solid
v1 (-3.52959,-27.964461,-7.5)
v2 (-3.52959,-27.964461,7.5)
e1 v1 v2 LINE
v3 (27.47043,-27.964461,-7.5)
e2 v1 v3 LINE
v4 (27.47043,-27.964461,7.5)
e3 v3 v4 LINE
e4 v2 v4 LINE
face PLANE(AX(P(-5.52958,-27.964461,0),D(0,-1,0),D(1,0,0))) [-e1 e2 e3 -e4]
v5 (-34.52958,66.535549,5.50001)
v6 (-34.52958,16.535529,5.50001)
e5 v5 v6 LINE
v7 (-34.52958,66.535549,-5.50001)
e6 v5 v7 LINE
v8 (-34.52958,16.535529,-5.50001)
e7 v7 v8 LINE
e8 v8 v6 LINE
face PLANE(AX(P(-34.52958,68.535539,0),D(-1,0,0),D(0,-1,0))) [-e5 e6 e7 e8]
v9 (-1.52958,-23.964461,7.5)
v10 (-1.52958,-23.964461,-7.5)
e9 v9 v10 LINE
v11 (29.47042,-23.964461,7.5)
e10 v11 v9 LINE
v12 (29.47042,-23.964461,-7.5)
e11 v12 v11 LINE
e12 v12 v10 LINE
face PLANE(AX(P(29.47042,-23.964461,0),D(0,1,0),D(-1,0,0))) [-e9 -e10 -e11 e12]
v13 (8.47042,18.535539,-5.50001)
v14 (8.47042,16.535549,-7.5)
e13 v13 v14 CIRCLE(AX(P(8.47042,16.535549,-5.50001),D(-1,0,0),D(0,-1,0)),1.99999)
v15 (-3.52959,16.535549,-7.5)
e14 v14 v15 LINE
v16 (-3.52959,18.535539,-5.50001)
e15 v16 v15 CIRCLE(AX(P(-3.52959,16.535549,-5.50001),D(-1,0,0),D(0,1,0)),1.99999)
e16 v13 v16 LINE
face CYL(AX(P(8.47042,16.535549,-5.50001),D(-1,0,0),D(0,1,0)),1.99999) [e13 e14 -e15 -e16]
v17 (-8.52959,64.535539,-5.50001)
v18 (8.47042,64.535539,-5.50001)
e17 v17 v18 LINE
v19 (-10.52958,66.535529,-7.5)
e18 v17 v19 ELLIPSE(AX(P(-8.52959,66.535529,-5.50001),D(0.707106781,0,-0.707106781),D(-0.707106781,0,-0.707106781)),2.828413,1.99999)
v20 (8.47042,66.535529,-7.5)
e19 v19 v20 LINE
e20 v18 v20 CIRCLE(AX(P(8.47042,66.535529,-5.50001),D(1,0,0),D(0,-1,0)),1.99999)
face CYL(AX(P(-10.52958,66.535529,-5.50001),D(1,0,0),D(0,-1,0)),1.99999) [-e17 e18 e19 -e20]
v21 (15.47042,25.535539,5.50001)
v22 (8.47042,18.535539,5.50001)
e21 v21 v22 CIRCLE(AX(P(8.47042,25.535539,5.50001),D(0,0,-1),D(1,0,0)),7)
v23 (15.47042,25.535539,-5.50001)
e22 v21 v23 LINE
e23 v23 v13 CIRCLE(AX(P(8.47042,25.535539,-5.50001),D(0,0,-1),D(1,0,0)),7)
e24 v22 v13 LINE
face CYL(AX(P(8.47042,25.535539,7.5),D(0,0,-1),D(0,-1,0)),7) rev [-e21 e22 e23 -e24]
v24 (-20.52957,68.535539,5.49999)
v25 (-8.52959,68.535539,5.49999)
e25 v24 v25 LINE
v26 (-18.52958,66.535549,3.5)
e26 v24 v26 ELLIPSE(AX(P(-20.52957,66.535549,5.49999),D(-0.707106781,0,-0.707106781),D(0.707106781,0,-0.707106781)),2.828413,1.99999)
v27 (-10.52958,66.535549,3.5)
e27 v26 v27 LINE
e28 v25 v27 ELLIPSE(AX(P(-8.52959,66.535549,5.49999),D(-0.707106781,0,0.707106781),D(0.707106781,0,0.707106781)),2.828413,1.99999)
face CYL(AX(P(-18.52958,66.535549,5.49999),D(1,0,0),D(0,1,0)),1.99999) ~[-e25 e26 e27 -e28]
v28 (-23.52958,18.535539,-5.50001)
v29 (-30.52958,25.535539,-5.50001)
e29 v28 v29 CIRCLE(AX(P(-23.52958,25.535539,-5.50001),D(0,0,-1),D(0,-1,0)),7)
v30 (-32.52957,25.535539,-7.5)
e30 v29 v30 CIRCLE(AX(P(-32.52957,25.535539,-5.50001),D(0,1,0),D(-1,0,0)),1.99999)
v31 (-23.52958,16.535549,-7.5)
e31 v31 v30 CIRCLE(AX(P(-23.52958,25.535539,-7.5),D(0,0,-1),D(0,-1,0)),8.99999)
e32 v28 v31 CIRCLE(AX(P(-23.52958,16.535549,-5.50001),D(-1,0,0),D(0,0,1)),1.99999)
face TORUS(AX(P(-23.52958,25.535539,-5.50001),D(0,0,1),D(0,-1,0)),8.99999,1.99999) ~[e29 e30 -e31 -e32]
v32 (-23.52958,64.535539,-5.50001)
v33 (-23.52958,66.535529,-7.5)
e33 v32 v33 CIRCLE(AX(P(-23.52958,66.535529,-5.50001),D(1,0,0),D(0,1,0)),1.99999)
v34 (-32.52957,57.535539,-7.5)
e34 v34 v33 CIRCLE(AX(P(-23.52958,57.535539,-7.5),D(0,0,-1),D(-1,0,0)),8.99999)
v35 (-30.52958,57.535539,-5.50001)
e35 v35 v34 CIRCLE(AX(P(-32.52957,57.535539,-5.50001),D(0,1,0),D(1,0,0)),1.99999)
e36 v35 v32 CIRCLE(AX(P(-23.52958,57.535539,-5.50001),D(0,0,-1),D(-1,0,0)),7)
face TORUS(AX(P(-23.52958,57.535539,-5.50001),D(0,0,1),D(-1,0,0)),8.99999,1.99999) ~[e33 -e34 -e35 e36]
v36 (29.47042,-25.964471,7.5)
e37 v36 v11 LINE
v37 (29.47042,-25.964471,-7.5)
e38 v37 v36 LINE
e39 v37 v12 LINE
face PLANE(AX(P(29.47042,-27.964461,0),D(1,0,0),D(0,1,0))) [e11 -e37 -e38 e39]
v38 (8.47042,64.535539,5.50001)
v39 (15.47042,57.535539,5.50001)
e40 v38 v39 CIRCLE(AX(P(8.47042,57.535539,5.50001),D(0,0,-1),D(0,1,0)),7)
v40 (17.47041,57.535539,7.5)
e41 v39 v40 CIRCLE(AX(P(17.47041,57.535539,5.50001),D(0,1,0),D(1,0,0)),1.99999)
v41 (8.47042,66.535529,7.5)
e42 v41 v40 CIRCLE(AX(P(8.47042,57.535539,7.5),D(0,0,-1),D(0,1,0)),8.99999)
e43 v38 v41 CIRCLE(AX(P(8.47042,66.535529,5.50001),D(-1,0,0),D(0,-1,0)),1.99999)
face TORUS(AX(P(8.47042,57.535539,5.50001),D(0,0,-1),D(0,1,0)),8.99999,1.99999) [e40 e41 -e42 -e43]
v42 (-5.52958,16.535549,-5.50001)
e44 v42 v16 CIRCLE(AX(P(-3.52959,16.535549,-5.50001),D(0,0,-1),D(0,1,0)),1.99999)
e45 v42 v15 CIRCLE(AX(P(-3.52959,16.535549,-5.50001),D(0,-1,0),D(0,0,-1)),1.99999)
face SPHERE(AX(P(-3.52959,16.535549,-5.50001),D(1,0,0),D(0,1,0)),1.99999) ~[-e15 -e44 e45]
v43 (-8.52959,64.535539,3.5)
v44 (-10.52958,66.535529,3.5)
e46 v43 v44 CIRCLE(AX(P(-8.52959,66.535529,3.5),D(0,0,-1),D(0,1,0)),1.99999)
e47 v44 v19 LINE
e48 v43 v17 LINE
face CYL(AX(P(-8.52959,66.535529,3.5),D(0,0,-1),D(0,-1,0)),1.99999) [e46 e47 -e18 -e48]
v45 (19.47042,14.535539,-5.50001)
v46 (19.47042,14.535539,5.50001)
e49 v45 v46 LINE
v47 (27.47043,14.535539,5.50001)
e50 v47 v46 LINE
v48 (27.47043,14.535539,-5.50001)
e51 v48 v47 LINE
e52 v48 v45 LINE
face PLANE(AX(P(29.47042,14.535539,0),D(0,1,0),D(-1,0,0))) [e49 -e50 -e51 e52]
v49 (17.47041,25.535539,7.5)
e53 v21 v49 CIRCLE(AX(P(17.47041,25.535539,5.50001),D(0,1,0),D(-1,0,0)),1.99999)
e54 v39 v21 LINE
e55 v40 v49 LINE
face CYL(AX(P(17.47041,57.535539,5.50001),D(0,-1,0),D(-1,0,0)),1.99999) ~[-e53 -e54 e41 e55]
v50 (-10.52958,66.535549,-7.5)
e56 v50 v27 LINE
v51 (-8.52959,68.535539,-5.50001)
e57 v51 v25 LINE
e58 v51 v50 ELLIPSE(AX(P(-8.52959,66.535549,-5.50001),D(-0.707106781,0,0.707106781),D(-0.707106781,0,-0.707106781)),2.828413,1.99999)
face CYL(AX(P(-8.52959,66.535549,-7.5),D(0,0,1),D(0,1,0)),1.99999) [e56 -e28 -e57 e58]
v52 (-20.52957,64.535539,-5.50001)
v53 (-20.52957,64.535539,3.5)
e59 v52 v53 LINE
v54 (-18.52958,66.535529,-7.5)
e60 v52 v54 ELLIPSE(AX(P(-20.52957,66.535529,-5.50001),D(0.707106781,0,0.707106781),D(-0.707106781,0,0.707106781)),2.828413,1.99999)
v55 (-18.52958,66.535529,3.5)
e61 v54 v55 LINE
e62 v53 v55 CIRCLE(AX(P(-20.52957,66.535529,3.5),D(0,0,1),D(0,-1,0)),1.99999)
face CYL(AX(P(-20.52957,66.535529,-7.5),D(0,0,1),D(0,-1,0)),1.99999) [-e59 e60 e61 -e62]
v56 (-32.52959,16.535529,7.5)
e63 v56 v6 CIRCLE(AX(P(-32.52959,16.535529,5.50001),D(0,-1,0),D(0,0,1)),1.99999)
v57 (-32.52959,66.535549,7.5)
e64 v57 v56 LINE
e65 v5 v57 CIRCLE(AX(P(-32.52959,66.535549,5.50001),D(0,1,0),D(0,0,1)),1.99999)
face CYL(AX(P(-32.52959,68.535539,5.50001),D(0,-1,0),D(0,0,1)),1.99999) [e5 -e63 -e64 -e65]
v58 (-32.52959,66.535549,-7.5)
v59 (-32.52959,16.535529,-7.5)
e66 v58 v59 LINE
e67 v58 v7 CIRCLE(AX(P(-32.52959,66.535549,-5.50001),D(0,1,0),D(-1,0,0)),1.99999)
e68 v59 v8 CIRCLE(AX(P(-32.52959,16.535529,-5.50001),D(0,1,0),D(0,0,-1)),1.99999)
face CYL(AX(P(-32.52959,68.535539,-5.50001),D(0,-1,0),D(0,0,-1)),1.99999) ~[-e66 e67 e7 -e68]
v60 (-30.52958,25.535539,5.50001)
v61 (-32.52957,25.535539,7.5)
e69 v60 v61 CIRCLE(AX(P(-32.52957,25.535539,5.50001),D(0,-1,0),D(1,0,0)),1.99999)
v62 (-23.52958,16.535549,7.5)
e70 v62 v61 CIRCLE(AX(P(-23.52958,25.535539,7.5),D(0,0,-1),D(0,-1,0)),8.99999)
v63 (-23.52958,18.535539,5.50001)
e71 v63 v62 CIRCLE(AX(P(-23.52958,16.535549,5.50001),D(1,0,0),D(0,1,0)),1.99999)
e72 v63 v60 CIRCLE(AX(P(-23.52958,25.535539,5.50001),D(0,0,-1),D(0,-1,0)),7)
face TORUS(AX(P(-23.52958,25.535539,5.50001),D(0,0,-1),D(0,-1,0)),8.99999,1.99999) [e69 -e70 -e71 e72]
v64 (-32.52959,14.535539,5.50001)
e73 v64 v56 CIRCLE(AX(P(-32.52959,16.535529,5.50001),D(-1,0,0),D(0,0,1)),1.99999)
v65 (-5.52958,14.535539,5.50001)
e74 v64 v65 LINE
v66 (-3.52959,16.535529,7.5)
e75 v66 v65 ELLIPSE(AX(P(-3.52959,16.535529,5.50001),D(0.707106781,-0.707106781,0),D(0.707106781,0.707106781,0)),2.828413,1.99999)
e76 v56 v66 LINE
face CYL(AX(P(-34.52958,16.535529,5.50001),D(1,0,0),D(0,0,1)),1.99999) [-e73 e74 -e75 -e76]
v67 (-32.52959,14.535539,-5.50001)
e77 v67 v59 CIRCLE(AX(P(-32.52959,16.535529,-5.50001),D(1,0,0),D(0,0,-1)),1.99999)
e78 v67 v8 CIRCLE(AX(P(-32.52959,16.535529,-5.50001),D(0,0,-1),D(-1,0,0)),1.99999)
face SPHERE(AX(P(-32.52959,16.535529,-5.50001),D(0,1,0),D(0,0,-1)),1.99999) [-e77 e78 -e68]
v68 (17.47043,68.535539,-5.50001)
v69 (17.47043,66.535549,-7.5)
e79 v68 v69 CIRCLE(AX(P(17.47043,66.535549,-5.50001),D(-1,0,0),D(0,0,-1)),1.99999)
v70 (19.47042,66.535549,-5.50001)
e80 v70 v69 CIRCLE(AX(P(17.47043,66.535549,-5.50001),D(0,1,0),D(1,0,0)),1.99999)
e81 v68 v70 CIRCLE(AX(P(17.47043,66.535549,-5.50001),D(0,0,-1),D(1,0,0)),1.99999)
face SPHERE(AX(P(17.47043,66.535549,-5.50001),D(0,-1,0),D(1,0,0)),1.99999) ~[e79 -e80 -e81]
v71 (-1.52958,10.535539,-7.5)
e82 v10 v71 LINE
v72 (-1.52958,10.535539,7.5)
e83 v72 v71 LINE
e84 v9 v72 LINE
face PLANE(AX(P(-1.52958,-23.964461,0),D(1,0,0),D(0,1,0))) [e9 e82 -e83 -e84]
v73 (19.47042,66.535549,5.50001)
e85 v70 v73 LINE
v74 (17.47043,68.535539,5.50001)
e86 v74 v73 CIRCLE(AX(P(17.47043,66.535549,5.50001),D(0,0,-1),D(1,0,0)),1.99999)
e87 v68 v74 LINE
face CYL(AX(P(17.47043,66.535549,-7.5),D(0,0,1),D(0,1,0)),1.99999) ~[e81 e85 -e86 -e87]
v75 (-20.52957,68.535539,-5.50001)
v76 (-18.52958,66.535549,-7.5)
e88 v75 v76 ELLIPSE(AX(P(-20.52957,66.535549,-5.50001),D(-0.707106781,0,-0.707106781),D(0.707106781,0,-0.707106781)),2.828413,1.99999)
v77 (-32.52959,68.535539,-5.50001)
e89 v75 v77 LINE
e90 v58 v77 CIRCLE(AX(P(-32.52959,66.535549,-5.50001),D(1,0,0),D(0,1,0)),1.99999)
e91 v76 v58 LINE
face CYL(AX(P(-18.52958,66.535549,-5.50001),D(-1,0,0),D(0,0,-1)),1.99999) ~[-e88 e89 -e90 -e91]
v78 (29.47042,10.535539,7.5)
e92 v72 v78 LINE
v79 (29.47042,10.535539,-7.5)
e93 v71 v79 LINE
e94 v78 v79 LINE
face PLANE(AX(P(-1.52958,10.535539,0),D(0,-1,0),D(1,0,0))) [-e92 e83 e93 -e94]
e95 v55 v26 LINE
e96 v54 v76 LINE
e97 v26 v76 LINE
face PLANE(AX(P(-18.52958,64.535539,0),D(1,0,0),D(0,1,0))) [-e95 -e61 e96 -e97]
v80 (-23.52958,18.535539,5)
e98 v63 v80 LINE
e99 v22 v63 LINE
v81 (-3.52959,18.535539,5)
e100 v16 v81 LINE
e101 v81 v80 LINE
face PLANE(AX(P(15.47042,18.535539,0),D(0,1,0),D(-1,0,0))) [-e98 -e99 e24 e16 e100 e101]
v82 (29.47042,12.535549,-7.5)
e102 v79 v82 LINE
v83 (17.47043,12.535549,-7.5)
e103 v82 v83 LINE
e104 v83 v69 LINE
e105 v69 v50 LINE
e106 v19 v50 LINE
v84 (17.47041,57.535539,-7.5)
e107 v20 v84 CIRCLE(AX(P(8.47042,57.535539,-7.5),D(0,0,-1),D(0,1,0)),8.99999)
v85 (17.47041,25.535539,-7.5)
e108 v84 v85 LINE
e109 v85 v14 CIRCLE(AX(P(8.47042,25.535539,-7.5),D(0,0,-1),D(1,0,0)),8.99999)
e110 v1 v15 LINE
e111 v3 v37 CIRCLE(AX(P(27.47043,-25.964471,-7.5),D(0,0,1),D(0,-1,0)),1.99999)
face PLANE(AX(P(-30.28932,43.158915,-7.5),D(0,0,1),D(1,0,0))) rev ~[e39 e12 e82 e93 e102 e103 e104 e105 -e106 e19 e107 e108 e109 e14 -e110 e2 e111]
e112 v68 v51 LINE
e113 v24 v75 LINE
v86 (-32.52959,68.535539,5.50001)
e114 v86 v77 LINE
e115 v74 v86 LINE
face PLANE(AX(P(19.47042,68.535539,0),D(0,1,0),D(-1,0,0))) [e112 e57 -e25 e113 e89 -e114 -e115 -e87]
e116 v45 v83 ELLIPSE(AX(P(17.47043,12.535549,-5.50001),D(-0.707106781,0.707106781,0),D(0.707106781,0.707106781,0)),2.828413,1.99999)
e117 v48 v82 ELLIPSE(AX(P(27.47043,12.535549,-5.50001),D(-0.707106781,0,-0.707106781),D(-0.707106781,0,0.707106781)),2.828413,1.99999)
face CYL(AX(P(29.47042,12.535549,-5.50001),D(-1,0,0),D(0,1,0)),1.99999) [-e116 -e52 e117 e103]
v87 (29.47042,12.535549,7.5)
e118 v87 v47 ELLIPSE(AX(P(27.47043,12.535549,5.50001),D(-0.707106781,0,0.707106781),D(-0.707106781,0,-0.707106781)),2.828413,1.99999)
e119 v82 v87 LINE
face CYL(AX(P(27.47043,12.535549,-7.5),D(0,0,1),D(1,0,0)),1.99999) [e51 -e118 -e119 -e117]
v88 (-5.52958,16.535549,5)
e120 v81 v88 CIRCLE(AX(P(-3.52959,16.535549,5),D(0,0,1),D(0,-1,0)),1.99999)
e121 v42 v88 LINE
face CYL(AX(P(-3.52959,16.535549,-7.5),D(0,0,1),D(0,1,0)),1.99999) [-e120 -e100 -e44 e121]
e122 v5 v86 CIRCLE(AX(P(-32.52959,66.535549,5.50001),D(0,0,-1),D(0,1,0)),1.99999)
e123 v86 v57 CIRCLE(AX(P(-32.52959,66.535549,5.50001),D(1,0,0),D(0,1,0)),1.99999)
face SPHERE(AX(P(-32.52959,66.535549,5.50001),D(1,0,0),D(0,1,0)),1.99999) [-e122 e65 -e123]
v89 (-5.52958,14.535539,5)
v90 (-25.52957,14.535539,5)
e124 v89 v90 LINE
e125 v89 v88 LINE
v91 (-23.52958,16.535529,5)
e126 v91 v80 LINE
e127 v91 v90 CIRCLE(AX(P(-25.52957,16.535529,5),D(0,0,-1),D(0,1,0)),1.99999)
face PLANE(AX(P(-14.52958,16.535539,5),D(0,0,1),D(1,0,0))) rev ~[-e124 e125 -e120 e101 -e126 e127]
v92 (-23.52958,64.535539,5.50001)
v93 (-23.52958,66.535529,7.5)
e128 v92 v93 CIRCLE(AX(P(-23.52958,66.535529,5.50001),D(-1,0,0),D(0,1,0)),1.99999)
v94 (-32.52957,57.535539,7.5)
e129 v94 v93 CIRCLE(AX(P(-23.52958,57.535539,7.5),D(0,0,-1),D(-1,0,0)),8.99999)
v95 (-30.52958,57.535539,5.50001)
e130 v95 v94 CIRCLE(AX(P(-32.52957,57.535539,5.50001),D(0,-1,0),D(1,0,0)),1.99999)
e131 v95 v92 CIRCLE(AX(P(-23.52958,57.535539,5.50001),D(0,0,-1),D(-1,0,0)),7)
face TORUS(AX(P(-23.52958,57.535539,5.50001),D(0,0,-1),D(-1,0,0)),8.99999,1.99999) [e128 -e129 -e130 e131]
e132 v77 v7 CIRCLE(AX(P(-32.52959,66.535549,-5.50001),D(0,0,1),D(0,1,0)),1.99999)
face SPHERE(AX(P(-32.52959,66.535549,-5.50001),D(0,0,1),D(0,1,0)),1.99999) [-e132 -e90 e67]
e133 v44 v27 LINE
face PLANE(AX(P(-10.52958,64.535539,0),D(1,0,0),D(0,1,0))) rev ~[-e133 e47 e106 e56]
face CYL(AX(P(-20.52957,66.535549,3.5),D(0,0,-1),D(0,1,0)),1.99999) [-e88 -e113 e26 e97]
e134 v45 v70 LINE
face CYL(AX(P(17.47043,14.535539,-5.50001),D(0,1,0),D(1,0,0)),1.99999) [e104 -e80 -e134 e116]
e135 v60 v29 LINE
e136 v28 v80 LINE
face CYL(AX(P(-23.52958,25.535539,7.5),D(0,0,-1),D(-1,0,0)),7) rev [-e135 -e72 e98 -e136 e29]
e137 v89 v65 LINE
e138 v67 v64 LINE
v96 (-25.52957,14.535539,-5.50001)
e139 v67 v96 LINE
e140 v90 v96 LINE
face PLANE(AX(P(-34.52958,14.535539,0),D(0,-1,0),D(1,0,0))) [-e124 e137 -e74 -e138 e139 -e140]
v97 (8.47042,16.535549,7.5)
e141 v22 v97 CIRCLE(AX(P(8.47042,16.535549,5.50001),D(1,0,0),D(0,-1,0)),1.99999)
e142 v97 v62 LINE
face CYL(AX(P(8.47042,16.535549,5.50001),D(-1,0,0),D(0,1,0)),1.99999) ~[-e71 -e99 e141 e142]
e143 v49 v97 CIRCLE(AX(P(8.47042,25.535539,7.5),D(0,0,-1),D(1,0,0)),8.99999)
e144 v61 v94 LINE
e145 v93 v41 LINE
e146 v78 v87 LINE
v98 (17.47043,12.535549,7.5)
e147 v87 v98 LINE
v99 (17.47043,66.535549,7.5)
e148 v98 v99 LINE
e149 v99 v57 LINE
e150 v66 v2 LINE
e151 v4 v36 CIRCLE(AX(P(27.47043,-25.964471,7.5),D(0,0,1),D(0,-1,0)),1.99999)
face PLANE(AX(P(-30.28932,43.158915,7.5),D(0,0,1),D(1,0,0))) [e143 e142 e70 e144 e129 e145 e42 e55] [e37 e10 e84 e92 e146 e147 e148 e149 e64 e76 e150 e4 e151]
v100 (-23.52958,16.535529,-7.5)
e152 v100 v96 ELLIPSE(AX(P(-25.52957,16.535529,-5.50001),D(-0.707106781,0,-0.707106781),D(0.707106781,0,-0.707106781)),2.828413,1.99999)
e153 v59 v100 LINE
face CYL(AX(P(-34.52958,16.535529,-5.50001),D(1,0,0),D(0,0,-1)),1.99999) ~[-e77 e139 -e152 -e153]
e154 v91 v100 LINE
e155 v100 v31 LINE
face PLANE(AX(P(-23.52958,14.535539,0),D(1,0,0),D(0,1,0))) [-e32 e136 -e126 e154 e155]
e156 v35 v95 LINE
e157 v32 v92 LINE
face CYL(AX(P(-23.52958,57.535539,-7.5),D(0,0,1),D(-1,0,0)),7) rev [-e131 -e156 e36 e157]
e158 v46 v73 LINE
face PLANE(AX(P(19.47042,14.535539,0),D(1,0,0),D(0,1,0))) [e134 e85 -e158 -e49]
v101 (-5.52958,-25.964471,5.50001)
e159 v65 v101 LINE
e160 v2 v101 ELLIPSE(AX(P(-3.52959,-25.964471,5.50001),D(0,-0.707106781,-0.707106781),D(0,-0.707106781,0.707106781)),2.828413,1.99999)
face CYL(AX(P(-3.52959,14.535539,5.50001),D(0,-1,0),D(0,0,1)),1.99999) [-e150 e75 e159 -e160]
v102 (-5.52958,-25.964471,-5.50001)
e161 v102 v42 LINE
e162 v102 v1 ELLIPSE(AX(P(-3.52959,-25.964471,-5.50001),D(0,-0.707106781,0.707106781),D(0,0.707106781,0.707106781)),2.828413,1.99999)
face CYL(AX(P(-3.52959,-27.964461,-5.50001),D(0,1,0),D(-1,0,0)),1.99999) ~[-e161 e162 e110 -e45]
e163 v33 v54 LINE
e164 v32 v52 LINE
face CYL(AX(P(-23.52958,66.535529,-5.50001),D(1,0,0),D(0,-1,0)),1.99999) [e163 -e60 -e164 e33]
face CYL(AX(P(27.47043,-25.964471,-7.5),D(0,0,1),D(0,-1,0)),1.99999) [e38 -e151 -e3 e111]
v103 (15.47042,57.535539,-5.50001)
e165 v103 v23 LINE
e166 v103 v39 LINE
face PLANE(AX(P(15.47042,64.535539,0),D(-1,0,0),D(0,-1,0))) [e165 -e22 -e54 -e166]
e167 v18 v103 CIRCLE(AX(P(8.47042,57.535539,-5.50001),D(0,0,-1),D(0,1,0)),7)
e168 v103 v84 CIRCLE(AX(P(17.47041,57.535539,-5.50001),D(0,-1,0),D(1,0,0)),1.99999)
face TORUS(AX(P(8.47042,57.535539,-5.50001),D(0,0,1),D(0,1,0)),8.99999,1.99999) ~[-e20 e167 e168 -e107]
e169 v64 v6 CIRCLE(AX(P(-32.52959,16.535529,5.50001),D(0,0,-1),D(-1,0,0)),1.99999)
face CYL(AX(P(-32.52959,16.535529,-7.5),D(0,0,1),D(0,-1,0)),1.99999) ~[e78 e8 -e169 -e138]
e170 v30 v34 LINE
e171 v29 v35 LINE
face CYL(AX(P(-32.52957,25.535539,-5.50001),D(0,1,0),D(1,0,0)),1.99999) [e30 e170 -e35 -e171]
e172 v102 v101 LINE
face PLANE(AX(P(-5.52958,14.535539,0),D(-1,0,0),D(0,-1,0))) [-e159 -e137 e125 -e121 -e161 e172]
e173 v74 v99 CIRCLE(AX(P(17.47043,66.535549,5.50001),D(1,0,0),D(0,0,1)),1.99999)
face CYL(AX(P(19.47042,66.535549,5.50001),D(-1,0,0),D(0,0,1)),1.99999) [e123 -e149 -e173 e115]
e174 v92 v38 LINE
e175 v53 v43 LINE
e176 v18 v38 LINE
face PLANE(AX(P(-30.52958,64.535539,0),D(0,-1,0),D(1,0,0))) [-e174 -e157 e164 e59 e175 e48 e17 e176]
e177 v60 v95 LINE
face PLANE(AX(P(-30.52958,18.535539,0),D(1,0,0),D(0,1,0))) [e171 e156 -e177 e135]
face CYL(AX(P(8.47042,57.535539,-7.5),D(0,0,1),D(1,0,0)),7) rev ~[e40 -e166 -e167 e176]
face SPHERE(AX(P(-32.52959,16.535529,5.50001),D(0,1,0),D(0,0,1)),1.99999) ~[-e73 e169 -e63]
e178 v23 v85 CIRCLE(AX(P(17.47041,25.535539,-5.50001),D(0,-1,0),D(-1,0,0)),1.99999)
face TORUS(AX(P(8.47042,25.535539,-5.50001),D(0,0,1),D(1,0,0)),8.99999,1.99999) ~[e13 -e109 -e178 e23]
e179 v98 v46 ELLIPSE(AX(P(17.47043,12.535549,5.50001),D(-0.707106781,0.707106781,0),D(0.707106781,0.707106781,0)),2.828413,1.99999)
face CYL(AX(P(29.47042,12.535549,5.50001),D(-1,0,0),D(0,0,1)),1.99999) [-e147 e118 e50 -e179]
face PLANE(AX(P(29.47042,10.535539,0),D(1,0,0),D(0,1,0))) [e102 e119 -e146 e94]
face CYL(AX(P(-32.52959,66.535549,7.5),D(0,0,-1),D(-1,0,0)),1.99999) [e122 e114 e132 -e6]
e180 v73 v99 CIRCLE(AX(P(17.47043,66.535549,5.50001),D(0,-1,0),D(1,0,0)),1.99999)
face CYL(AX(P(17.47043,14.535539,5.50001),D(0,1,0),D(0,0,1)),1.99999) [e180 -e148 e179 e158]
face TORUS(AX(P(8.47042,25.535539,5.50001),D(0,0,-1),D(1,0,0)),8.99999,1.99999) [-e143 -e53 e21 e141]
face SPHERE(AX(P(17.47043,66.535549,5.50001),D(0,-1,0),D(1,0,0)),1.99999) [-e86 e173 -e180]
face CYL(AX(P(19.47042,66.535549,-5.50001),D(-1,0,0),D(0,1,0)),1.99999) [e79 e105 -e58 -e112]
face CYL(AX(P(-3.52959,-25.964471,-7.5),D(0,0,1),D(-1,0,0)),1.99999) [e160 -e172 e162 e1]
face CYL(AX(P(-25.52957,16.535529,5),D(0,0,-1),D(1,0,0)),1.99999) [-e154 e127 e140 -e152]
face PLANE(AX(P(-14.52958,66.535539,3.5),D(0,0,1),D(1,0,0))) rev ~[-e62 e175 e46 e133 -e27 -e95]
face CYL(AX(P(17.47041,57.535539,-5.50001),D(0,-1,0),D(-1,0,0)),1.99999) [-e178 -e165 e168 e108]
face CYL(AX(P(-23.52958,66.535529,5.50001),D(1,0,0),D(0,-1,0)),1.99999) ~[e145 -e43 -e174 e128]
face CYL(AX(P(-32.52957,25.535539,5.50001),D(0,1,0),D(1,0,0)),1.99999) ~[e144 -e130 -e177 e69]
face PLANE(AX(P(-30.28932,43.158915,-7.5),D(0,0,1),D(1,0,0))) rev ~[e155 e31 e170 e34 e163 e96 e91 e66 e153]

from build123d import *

# Parameters (mm, degrees)
F1_DEPTH = 7.5
F2_W     = 18
F2_H     = 4
F2_W_2   = 8
F3_DEPTH = 7.5
F4_DEPTH = 5
F5_DEPTH = 25
F6_DEPTH = 3.5
F7_DEPTH = 25
F8_R     = 7
F9_R     = 1.99999


# Not quite as in the source:
# - a fillet or chamfer is up to 0.001 mm smaller than in the source, because OpenCascade refuses the exact size


with BuildPart() as f1:
    # F0 (on Top) → F1 (new body, symmetric)
    with BuildSketch(Plane.XY):
        Polygon((29.4704200836, 10.5355388032), (29.4704200836, 14.5355388032), (-5.5295799164, 14.5355388032), (-5.5295799164, -27.9644611968), (29.4704200836, -27.9644611968), (29.4704200836, -23.9644611968), (27.4704200836, -23.9644611968), (-1.5295799164, -23.9644611968), (-1.5295799164, 10.5355388032), (27.4704200836, 10.5355388032), align=None)
    extrude(amount=F1_DEPTH, both=True)

    # F2 (on Top) → F3 (join, symmetric)
    with BuildSketch(Plane.XY):
        Polygon((-30.5295799164, 18.5355388032), (-30.5295799164, 64.5355388032), (-18.5295799164, 64.5355388032), (-18.5295799164, 68.5355388032), (-34.5295799164, 68.5355388032), (-34.5295799164, 14.5355388032), (-23.5295799164, 14.5355388032), (-23.5295799164, 18.5355388032), align=None)
        Polygon((-10.5295799164, 68.5355388032), (-10.5295799164, 64.5355388032), (15.4704200836, 64.5355388032), (15.4704200836, 18.5355388032), (-5.5295799164, 18.5355388032), (-5.5295799164, 14.5355388032), (19.4704200836, 14.5355388032), (19.4704200836, 68.5355388032), align=None)
        with Locations((-14.5295799164, 16.5355388032)):
            Rectangle(F2_W, F2_H)
        with Locations((-14.5295799164, 66.5355388032)):
            Rectangle(F2_W_2, F2_H)
    extrude(amount=F3_DEPTH, both=True)

    # F2 (on Top) → F4 (cut, symmetric)
    with BuildSketch(Plane.XY):
        with Locations((-14.5295799164, 16.5355388032)):
            Rectangle(F2_W, F2_H)
    extrude(amount=F4_DEPTH, both=True, mode=Mode.SUBTRACT)

    # F2 (on Top) → F5 (cut)
    with BuildSketch(Plane.XY):
        with Locations((-14.5295799164, 16.5355388032)):
            Rectangle(F2_W, F2_H)
    extrude(amount=-F5_DEPTH, mode=Mode.SUBTRACT)

    # F2 (on Top) → F6 (cut, symmetric)
    with BuildSketch(Plane.XY):
        with Locations((-14.5295799164, 66.5355388032)):
            Rectangle(F2_W_2, F2_H)
    extrude(amount=F6_DEPTH, both=True, mode=Mode.SUBTRACT)

    # F2 (on Top) → F7 (cut)
    with BuildSketch(Plane.XY):
        with Locations((-14.5295799164, 66.5355388032)):
            Rectangle(F2_W_2, F2_H)
    extrude(amount=-F7_DEPTH, mode=Mode.SUBTRACT)

    # F8
    f8_edges = [f1.edges().sort_by_distance(p)[0] for p in [
        (-30.52958, 64.535539, 0),
        (15.47042, 64.535539, 0),
        (-30.52958, 18.535539, 0),
        (15.47042, 18.535539, 0),
    ]]
    fillet(f8_edges, radius=F8_R)

    # F9 (radius 2 in the source; OpenCascade refuses exactly that, so slightly less here)
    f9_edges = [f1.edges().sort_by_distance(p)[0] for p in [
        (19.47042, 41.535539, 7.5),
        (19.47042, 41.535539, -7.5),
        (24.47042, 14.535539, 7.5),
        (24.47042, 14.535539, -7.5),
        (19.47042, 68.535539, 0),
        (4.47042, 68.535539, -7.5),
        (-7.52958, 68.535539, 7.5),
        (-14.52958, 68.535539, 3.5),
        (-18.52958, 68.535539, -2),
        (-10.52958, 68.535539, -2),
        (-10.52958, 64.535539, -2),
        (-18.52958, 64.535539, -2),
        (-34.52958, 68.535539, 0),
        (-26.52958, 68.535539, -7.5),
        (-30.52958, 41.535539, -7.5),
        (15.47042, 41.535539, -7.5),
        (-34.52958, 41.535539, -7.5),
        (-29.02958, 14.535539, -7.5),
        (-34.52958, 41.535539, 7.5),
        (-20.02958, 14.535539, 7.5),
        (-30.52958, 41.535539, 7.5),
        (-23.52958, 14.535539, -1.25),
        (-5.52958, 18.535539, -1.25),
        (-5.52958, -4.714461, -7.5),
        (-5.52958, -6.714461, 7.5),
        (29.47042, -27.964461, 0),
        (-5.52958, -27.964461, 0),
        (-34.52958, 14.535539, 0),
        (29.47042, 14.535539, 0),
        (-21.02958, 64.535539, -7.5),
        (-28.479327, 62.485286, -7.5),
        (-28.479327, 20.585791, -7.5),
        (-28.479327, 20.585791, 7.5),
        (-7.52958, 64.535539, 7.5),
        (-1.02958, 64.535539, -7.5),
        (-28.479327, 62.485286, 7.5),
        (-7.52958, 18.535539, 7.5),
        (13.420168, 20.585791, 7.5),
        (13.420168, 62.485286, 7.5),
        (15.47042, 41.535539, 7.5),
        (1.47042, 18.535539, -7.5),
        (13.420168, 62.485286, -7.5),
        (13.420168, 20.585791, -7.5),
    ]]
    fillet(f9_edges, radius=F9_R)


solid = f1.part
